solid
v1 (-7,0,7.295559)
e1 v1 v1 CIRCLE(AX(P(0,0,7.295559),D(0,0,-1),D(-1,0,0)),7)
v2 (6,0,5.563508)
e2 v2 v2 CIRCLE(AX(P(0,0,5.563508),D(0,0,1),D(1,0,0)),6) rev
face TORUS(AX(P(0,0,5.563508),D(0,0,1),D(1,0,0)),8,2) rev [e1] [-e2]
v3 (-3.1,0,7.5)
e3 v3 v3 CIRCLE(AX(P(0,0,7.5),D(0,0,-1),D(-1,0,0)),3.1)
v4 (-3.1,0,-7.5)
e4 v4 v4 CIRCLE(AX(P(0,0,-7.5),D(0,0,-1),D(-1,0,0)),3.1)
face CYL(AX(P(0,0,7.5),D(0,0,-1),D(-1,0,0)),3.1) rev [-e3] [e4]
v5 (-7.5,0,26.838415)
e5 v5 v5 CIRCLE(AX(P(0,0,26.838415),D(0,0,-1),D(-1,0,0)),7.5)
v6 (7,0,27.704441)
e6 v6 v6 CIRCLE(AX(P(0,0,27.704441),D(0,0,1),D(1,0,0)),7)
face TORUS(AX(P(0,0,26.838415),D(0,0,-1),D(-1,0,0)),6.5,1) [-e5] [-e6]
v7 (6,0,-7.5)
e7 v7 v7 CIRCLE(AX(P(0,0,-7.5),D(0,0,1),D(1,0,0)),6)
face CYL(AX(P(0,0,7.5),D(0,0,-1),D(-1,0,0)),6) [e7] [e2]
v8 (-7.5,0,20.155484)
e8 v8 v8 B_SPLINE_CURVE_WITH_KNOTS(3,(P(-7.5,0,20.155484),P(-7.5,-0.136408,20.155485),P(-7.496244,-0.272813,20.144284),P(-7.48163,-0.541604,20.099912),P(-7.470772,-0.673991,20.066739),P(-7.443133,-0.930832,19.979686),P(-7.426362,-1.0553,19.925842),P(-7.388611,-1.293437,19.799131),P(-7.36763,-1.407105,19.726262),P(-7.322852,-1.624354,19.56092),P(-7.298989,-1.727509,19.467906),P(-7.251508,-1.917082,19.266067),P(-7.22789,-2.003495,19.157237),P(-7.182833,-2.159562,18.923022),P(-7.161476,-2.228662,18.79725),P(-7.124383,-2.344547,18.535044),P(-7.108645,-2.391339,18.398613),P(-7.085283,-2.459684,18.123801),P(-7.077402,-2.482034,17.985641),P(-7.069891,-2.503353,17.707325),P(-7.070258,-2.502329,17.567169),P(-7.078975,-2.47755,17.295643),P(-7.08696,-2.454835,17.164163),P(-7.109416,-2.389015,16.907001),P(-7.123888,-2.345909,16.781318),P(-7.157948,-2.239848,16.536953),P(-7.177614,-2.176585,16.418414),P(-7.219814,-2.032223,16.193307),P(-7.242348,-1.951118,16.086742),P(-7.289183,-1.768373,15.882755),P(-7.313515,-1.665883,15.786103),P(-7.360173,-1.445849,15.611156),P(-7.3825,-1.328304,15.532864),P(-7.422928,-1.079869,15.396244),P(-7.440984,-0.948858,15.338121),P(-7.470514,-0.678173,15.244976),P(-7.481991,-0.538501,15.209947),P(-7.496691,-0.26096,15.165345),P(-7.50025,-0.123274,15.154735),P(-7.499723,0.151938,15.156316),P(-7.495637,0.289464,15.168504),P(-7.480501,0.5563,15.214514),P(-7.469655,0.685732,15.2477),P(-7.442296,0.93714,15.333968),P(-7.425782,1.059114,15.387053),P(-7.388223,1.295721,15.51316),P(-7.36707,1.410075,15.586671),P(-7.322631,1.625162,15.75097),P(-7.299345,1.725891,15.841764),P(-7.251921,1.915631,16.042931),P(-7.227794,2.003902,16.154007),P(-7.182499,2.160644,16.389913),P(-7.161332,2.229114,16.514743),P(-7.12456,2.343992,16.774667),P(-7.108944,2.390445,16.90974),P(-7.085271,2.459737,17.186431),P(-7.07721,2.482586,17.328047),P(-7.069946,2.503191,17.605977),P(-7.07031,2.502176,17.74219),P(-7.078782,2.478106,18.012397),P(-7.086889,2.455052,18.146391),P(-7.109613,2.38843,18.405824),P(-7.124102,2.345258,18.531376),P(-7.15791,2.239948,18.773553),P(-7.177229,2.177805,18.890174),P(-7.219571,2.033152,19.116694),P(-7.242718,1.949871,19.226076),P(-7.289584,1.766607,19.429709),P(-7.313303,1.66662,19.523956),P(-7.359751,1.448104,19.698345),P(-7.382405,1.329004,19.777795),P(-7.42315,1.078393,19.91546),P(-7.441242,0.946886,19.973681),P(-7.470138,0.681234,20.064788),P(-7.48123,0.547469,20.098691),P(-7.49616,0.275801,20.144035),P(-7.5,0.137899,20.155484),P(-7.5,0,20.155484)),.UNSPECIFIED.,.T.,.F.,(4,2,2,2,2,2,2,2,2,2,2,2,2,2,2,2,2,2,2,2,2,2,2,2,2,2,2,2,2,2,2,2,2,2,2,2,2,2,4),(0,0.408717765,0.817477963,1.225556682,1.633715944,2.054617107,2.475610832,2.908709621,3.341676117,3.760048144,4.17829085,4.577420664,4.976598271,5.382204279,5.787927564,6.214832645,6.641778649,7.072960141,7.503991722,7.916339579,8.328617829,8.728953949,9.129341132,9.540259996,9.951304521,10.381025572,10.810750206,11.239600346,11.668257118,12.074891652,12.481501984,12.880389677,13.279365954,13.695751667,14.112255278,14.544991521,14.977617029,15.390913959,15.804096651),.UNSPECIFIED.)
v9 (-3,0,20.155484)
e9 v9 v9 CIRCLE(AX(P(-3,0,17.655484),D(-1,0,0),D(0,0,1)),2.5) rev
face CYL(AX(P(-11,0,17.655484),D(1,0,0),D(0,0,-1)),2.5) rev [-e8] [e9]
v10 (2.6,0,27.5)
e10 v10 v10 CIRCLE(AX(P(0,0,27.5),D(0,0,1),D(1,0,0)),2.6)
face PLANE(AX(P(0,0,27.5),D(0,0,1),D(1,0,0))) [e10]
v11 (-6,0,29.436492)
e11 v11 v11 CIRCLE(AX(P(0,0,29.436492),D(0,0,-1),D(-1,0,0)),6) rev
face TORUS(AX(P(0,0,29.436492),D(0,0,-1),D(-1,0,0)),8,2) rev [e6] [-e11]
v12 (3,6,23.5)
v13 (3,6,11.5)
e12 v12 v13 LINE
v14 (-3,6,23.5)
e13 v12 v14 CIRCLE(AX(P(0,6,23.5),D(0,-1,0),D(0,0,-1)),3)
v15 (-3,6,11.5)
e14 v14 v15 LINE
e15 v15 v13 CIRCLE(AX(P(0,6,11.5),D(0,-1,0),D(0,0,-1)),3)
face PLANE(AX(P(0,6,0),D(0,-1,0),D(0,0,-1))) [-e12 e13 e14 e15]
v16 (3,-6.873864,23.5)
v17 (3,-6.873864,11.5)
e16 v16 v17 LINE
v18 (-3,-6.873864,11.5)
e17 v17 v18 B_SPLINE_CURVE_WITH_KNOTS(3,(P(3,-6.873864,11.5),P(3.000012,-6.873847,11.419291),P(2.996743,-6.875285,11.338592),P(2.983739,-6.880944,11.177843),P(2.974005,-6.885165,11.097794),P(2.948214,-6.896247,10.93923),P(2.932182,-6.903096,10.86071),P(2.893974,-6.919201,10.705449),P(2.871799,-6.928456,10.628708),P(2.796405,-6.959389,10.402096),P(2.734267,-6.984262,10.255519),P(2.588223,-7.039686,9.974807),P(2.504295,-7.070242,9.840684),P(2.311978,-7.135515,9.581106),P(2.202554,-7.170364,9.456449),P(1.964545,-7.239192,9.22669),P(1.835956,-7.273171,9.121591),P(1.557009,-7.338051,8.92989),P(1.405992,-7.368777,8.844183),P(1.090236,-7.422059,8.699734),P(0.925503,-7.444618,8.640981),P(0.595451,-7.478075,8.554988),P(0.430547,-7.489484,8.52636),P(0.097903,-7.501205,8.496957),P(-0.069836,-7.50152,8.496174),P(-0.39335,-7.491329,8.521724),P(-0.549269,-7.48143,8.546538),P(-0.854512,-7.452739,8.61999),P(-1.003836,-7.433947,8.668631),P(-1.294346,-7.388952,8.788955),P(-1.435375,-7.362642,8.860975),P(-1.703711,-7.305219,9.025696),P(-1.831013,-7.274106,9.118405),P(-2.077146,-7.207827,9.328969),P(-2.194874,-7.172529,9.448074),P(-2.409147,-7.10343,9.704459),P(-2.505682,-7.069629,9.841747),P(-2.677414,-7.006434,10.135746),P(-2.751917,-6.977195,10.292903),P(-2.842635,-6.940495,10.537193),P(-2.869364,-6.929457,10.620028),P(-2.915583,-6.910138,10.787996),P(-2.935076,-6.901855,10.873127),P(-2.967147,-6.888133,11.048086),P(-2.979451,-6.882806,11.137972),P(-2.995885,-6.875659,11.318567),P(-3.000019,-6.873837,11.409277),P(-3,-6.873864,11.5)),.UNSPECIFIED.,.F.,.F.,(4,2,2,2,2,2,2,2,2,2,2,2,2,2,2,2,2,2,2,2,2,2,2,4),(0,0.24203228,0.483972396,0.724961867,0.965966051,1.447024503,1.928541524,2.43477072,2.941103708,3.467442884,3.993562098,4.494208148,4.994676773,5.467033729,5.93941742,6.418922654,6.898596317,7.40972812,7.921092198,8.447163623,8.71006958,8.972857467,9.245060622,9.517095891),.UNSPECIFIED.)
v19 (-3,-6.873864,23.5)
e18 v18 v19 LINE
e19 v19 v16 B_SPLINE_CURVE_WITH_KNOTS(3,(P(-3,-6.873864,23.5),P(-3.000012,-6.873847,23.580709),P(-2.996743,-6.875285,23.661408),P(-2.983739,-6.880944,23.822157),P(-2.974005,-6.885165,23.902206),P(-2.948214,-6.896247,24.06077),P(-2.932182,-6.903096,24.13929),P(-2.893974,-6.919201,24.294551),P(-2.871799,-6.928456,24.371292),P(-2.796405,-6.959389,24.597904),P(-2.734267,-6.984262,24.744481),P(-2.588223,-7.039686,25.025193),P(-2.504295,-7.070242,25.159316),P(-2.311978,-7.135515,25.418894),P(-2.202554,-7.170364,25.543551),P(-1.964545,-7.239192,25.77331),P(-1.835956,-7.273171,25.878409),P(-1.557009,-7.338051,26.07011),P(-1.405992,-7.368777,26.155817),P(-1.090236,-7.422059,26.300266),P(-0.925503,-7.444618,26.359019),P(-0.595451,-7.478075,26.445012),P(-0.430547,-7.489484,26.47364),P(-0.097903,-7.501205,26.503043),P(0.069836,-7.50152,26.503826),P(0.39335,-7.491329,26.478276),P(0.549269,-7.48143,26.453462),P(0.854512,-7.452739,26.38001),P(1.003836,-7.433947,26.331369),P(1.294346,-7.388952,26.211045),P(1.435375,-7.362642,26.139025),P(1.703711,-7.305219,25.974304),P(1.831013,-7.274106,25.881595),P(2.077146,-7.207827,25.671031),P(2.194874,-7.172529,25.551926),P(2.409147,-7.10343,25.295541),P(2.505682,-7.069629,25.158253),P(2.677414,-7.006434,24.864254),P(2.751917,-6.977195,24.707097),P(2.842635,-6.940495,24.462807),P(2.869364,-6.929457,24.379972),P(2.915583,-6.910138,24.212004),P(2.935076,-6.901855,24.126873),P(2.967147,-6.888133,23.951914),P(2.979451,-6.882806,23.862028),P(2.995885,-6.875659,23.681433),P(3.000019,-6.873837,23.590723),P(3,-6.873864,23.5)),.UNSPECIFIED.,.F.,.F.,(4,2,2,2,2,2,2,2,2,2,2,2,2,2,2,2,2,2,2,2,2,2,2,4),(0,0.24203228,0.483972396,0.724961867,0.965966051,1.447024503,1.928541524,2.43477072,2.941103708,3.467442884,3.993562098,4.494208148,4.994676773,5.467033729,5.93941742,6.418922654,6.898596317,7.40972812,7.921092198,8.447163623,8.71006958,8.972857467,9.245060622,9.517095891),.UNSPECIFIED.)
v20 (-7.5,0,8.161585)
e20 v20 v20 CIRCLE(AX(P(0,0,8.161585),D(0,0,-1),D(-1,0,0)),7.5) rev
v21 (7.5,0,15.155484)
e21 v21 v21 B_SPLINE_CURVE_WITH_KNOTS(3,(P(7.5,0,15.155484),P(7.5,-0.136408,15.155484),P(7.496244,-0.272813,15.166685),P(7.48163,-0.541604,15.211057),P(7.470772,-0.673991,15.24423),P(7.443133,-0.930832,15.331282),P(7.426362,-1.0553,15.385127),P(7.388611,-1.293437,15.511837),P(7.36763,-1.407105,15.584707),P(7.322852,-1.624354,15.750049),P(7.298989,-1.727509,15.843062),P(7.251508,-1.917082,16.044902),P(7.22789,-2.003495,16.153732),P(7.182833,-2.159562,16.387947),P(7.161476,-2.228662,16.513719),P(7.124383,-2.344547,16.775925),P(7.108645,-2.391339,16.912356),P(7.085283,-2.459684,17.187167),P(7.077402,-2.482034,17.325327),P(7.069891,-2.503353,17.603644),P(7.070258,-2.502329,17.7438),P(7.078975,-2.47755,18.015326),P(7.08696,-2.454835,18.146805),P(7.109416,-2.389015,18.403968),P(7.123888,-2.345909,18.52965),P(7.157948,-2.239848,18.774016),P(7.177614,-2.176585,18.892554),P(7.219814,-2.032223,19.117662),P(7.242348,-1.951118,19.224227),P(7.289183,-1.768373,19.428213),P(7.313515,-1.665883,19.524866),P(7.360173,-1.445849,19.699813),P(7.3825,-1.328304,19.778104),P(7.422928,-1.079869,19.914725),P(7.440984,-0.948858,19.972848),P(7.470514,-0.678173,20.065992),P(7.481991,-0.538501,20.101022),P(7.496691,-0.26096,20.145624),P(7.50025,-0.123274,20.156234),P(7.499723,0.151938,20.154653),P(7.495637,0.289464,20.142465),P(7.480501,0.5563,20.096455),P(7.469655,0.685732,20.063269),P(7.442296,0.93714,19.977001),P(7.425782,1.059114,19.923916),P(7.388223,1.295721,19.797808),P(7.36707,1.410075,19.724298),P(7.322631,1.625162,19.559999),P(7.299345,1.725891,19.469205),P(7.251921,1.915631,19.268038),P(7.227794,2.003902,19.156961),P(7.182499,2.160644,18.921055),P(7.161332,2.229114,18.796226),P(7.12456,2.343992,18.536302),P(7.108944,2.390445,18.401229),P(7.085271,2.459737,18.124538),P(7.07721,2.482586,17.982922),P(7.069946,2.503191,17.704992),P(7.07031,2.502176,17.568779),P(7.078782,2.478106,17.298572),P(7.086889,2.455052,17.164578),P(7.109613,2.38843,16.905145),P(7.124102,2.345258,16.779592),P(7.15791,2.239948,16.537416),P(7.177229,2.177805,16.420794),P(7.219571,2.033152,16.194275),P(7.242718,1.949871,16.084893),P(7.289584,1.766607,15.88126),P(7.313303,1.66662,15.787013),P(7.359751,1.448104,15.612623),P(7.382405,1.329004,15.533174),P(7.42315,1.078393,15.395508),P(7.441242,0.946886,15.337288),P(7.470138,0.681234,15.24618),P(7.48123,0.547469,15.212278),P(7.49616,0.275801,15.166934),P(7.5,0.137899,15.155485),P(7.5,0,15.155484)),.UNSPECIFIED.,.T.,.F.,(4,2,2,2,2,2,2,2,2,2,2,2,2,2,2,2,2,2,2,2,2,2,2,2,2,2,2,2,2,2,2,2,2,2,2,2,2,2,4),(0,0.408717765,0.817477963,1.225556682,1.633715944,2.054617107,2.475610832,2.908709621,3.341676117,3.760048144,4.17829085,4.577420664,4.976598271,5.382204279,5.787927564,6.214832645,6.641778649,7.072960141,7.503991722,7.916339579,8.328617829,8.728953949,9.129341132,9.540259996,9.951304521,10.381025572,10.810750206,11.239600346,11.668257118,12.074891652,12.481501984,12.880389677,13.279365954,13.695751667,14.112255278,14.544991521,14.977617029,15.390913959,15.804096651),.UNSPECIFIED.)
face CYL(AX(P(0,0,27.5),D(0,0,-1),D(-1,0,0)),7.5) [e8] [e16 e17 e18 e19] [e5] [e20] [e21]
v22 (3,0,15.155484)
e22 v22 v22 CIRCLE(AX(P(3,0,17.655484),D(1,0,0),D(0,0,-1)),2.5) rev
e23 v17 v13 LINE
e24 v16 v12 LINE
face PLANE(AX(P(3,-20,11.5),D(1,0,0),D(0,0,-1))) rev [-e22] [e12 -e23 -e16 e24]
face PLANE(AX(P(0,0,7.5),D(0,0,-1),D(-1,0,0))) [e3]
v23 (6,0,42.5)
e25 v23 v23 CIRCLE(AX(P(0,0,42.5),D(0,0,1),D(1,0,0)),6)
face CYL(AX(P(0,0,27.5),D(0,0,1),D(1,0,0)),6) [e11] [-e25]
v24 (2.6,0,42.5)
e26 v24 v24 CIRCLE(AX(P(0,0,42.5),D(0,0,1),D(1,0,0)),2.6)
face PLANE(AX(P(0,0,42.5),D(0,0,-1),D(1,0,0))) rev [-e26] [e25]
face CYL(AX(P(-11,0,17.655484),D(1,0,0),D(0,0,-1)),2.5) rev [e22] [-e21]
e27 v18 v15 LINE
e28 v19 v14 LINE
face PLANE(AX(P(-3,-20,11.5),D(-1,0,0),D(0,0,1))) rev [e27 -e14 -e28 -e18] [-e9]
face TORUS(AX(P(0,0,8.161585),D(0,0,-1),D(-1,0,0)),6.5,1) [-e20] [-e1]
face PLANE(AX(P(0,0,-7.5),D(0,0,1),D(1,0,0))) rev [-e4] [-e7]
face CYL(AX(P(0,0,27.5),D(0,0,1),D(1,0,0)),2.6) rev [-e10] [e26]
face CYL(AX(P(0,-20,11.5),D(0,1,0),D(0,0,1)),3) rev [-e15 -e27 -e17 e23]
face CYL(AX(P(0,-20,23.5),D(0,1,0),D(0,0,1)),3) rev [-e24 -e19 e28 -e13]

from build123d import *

# Parameters (mm, degrees)
SKETCH1_R           = 6
BOSS_EXTRUDE1_DEPTH = 7.5
SKETCH2_R           = 7.5
BOSS_EXTRUDE2_DEPTH = 20
SKETCH3_R           = 3.1
CUT_EXTRUDE1_DEPTH  = 15
SKETCH4_R           = 2.5
CUT_EXTRUDE2_DEPTH  = 11
CUT_EXTRUDE3_DEPTH  = 20
FILLET1_R           = 2
FILLET2_R           = 1
SKETCH7_R           = 2.6
CUT_EXTRUDE4_DEPTH  = 15
CUT_EXTRUDE5_START  = -6
CUT_EXTRUDE5_DEPTH  = 6


with BuildPart() as part:
    # Sketch1 → Boss-Extrude1 (new, symmetric)
    with BuildSketch(Plane.XY):
        Circle(SKETCH1_R)
    boss_extrude1 = extrude(amount=BOSS_EXTRUDE1_DEPTH, both=True)

    # Sketch2 → Boss-Extrude2 (add)
    with BuildSketch(Plane.XY.offset(7.5)):
        Circle(SKETCH2_R)
    extrude(amount=BOSS_EXTRUDE2_DEPTH)

    # Mirror1: Boss-Extrude1 across plane
    add(boss_extrude1.mirror(Plane.XY.offset(17.5)))

    # Sketch3 → Cut-Extrude1 (cut)
    with BuildSketch(Plane(origin=(0, 0, -7.5), x_dir=(-1, 0, 0), z_dir=(0, 0, -1))):
        Circle(SKETCH3_R)
    extrude(amount=-CUT_EXTRUDE1_DEPTH, mode=Mode.SUBTRACT)

    # Sketch4 → Cut-Extrude2 (cut, symmetric)
    with BuildSketch(Plane(origin=(0, 0, 0), x_dir=(0, 0, -1), z_dir=(1, 0, 0))):
        with Locations(Location((-17.655484387, 0, 0), (0, 0, 180))):
            Circle(SKETCH4_R)
    extrude(amount=CUT_EXTRUDE2_DEPTH, both=True, mode=Mode.SUBTRACT)

    # Sketch6 → Cut-Extrude3 (cut)
    with BuildSketch(Plane(origin=(0, 0, 0), x_dir=(1, 0, 0), z_dir=(0, 1, 0))):
        with BuildLine():
            Line((3, -11.5), (3, -23.5))
            ThreePointArc((3, -23.5), (0, -26.5), (-3, -23.5))
            Line((-3, -23.5), (-3, -11.5))
            ThreePointArc((-3, -11.5), (0, -8.5), (3, -11.5))
        make_face()
    extrude(amount=-CUT_EXTRUDE3_DEPTH, mode=Mode.SUBTRACT)

    # Fillet1
    # the kernel refuses this fillet: 2 mm, written as the material it adds along each edge
    with BuildSketch(Plane(origin=(0, 0, 7.5), x_dir=(1, 0, 0), z_dir=(0, -1, 0))) as fillet1_piece_1:
        with BuildLine():
            CenterArc((8, -1.936491673), FILLET1_R, 104.477512186, 75.522487814)
            Line((6, -1.936491673), (5.96, -1.936491673))
            Line((5.96, -1.936491673), (5.96, 0))
            Line((5.96, 0), (6, 0.04))
            ThreePointArc((6, 0.04), (6.75, 0.04), (7.49, 0.038729833))
            Line((7.49, 0.038729833), (7.5, 0))
        make_face()
    revolve(axis=Axis((0, 0, 7.5), (0, 0, 1)))
    with BuildSketch(Plane(origin=(0, 0, 27.5), x_dir=(1, 0, 0), z_dir=(0, -1, 0))) as fillet1_piece_2:
        with BuildLine():
            CenterArc((8, 1.936491673), FILLET1_R, 180, 75.522487814)
            Line((6, 1.936491673), (5.96, 1.936491673))
            Line((5.96, 1.936491673), (5.96, 0))
            Line((5.96, 0), (6, -0.04))
            ThreePointArc((6, -0.04), (6.75, -0.04), (7.49, -0.038729833))
            Line((7.49, -0.038729833), (7.5, 0))
        make_face()
    revolve(axis=Axis((0, 0, 27.5), (0, 0, 1)))

    # Fillet2
    fillet2_edges = [part.edges().sort_by_distance(p)[0] for p in [
        (-7.5, 0, 7.5),
        (-7.5, 0, 27.5),
    ]]
    fillet(fillet2_edges, radius=FILLET2_R)

    # Sketch7 → Cut-Extrude4 (cut)
    with BuildSketch(Plane.XY.offset(42.5)):
        Circle(SKETCH7_R)
    extrude(amount=-CUT_EXTRUDE4_DEPTH, mode=Mode.SUBTRACT)

    # Sketch8 → Cut-Extrude5 (cut)
    with BuildSketch(Plane.XZ.offset(CUT_EXTRUDE5_START)):
        with BuildLine():
            Line((3, 20.155484387), (-3, 20.155484387))
            Line((-3, 20.155484387), (-3, 15.155484387))
            Line((-3, 15.155484387), (-3, 11.5))
            ThreePointArc((-3, 11.5), (0, 8.5), (3, 11.5))
            Line((3, 11.5), (3, 15.155484387))
            Line((3, 15.155484387), (3, 20.155484387))
        make_face()
        with BuildLine():
            Line((-3, 20.155484387), (3, 20.155484387))
            Line((3, 20.155484387), (3, 23.5))
            ThreePointArc((3, 23.5), (0, 26.5), (-3, 23.5))
            Line((-3, 23.5), (-3, 20.155484387))
        make_face()
    extrude(amount=CUT_EXTRUDE5_DEPTH, mode=Mode.SUBTRACT)


solid = part.part
